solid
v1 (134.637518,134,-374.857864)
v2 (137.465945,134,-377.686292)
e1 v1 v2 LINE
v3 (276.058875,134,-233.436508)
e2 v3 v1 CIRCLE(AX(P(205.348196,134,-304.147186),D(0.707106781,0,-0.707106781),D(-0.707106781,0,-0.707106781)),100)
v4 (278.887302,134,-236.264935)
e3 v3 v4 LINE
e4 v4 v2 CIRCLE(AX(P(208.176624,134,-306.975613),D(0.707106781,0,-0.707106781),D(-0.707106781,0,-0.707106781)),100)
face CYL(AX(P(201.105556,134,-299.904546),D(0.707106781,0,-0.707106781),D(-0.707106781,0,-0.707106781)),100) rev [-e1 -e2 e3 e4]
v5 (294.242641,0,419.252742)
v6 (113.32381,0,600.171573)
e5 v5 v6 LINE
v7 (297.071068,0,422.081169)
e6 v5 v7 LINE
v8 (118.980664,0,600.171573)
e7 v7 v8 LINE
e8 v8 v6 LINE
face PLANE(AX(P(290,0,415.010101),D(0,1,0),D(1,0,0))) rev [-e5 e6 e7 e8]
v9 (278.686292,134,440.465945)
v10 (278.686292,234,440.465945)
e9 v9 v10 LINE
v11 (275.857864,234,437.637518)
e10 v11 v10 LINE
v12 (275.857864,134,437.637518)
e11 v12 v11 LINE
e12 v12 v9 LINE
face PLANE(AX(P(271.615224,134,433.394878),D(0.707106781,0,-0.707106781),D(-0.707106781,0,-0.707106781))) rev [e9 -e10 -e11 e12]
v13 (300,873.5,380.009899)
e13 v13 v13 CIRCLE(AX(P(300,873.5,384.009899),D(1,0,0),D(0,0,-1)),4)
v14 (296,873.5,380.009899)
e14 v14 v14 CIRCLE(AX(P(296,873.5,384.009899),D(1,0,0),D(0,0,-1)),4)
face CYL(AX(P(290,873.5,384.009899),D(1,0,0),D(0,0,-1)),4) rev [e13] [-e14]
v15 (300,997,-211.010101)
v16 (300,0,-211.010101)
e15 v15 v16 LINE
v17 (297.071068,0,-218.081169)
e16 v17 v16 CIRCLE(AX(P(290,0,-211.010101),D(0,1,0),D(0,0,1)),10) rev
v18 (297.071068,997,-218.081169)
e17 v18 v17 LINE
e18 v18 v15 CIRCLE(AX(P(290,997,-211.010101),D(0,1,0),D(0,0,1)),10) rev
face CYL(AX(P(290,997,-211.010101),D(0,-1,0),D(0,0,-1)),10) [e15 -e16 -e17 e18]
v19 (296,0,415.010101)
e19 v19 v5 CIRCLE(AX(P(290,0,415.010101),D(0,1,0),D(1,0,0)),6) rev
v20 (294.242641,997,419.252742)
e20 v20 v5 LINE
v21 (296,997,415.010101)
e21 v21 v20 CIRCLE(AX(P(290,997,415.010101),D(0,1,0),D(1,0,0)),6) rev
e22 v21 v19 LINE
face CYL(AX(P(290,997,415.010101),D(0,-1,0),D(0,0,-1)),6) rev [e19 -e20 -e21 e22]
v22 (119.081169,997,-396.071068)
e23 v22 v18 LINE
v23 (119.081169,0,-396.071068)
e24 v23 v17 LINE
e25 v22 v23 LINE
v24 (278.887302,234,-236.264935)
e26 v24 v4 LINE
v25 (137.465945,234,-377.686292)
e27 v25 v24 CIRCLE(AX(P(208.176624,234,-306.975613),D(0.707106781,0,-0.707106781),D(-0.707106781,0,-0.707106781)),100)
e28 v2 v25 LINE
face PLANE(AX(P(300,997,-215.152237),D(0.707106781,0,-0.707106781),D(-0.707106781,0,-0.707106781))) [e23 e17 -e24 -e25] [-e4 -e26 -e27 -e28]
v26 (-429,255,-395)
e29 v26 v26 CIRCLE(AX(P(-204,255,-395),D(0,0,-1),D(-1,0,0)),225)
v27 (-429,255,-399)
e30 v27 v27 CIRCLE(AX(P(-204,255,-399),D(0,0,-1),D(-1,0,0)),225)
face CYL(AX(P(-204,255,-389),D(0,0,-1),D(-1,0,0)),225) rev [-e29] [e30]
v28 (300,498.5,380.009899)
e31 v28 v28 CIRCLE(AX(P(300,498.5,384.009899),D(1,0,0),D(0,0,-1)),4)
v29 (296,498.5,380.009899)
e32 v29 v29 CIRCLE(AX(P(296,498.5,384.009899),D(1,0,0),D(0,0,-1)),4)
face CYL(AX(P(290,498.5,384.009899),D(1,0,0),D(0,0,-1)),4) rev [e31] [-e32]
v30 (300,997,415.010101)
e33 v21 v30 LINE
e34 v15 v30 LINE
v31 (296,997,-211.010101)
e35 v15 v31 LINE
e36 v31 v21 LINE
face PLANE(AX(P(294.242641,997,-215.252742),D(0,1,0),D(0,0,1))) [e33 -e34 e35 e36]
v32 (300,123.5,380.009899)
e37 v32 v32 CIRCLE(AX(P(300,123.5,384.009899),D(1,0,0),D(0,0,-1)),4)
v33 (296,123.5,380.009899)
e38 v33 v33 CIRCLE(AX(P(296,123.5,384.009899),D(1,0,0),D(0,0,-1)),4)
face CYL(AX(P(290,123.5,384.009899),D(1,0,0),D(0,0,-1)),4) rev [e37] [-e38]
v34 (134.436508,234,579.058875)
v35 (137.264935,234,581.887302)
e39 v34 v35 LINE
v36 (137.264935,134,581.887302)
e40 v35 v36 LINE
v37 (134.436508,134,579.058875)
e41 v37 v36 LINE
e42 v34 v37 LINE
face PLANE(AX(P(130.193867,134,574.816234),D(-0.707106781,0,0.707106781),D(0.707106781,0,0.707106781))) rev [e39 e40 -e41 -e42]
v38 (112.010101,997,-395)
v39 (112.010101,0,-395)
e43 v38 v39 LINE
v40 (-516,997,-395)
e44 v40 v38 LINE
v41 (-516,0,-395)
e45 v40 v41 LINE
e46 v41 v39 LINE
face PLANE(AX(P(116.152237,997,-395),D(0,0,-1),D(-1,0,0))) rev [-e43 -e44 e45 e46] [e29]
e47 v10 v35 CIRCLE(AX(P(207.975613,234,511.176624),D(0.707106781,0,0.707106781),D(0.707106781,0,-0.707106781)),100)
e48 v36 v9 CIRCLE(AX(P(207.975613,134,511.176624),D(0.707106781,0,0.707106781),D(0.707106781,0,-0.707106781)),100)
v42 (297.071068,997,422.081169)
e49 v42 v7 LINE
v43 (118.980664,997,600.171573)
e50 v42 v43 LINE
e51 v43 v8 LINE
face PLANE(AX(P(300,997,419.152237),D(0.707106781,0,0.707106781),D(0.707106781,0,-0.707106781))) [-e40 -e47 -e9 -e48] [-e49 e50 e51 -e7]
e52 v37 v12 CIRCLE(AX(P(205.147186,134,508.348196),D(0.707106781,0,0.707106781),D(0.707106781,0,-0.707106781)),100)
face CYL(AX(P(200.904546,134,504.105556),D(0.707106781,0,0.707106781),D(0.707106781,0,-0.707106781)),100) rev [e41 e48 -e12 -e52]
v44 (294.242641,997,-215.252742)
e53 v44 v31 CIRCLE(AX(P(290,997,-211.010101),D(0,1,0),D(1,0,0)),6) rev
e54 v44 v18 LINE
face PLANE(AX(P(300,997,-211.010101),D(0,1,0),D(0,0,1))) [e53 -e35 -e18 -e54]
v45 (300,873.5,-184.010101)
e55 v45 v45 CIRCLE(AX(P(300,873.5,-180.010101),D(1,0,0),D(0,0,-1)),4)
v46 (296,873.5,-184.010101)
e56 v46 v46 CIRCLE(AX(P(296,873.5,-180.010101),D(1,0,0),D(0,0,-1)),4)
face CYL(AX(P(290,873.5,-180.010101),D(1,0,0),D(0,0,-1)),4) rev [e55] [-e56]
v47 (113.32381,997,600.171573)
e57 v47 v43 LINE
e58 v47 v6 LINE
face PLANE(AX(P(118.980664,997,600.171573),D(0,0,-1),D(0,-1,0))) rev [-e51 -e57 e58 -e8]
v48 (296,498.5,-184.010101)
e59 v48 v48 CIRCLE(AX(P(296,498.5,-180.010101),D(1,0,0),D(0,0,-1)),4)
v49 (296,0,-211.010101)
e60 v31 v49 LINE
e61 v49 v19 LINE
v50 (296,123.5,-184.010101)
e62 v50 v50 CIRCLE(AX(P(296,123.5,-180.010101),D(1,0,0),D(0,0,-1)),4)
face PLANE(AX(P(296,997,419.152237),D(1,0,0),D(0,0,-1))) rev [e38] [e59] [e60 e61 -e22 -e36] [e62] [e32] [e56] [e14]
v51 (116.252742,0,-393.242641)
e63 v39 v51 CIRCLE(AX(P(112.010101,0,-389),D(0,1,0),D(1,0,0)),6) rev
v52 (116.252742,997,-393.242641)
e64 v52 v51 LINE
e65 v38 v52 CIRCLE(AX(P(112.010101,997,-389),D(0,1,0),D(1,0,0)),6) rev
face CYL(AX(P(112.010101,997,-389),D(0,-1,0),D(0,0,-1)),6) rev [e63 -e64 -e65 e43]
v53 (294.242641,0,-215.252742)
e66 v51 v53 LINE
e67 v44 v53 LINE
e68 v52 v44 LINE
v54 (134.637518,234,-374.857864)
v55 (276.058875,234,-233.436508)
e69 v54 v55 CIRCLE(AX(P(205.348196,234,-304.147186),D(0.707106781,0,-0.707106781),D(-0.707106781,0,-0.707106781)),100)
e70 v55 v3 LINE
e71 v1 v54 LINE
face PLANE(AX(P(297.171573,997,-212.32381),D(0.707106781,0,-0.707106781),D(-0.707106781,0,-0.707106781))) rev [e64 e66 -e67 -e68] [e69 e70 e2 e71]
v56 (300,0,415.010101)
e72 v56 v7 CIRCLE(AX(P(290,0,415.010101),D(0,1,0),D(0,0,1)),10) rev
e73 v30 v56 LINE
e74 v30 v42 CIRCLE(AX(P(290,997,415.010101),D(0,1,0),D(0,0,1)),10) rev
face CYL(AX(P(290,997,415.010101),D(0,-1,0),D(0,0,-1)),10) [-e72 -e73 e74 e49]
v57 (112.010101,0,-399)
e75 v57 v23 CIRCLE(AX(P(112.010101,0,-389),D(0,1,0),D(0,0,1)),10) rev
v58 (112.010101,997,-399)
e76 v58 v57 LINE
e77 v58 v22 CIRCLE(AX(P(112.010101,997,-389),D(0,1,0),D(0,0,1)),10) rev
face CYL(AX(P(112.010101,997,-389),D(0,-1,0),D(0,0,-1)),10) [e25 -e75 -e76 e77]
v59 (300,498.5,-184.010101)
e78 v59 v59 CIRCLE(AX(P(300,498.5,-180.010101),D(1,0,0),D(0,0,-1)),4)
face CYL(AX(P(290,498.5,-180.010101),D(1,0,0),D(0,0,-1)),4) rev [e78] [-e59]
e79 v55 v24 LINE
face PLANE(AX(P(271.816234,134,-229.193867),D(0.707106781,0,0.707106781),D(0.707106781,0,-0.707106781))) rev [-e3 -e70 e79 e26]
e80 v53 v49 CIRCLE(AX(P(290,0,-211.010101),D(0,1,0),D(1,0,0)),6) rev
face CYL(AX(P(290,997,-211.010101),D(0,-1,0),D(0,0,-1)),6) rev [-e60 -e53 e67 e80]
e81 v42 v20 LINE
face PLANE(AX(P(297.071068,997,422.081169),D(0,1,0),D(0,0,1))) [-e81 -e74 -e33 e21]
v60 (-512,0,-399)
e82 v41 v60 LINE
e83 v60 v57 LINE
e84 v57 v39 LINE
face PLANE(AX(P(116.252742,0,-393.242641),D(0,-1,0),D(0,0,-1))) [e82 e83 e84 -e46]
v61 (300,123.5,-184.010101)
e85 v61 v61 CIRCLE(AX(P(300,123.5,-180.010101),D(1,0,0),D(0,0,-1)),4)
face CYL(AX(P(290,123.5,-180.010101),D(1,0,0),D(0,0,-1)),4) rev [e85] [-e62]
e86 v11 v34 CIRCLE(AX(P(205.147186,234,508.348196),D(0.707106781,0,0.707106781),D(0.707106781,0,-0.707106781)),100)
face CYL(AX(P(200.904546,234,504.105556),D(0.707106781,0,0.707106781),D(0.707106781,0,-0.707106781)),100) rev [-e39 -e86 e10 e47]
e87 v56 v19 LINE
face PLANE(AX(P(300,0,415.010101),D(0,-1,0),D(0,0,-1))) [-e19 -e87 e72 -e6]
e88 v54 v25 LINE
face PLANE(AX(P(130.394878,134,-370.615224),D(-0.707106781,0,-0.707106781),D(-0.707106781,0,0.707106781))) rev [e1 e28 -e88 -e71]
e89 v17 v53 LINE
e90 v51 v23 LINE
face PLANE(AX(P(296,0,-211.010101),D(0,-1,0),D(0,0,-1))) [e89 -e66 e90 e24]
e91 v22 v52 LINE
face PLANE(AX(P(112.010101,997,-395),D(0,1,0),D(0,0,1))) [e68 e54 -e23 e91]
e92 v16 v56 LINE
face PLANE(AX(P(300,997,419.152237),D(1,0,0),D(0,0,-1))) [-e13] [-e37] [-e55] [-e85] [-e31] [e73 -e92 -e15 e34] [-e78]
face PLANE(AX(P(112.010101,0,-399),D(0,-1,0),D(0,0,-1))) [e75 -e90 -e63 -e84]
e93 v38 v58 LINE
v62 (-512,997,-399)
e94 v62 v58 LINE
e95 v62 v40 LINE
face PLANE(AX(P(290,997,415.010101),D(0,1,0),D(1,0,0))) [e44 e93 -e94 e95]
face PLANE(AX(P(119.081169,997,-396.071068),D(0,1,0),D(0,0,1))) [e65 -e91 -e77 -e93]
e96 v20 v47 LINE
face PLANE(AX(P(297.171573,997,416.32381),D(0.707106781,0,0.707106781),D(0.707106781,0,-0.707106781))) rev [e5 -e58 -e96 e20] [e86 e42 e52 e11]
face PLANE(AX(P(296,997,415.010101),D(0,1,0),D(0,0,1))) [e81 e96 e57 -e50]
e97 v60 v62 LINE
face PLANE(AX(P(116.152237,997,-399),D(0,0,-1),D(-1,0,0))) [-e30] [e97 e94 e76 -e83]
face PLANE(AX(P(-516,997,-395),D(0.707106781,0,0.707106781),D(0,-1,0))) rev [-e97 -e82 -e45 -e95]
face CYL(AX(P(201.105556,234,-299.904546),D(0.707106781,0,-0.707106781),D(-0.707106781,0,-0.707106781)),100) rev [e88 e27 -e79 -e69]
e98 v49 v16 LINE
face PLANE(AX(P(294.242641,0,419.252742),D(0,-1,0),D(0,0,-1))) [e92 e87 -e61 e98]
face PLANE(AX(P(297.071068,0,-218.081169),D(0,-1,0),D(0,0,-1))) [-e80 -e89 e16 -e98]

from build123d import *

# Parameters (mm, degrees)
BASE_FLANGE1_DEPTH   = 997
CUT_EXTRUDE1_DEPTH   = 10
SKETCH7_R            = 225
CUT_EXTRUDE2_DEPTH   = 10
SKETCH8_R            = 4
CUT_EXTRUDE3_DEPTH   = 10
CUT_EXTRUDE4_DEPTH   = 10
LPATTERN1_COUNT      = 3
LPATTERN1_PITCH      = 375
LPATTERN1_COUNT_DIR2 = 2
LPATTERN1_PITCH_DIR2 = 564.02
CHAMFER1_SIZE        = 4


# Sheet-metal steps are written as plain solids
with BuildPart() as part:
    # Sketch1 → Base-Flange1 (new body)
    with BuildSketch(Plane(origin=(0, 0, 0), x_dir=(1, 0, 0), z_dir=(0, 1, 0))):
        with BuildLine():
            Line((116.152236891, -603), (297.071067812, -422.08116908))
            ThreePointArc((297.071067812, -422.08116908), (299.238795325, -418.836935591), (300, -415.010101268))
            Line((300, -415.010101268), (300, 211.010101268))
            ThreePointArc((300, 211.010101268), (299.238795325, 214.836935591), (297.071067812, 218.08116908))
            Line((297.071067812, 218.08116908), (119.08116908, 396.071067812))
            ThreePointArc((119.08116908, 396.071067812), (115.836935591, 398.238795325), (112.010101268, 399))
            Line((112.010101268, 399), (-516, 399))
            Line((-516, 399), (-516, 395))
            Line((-516, 395), (112.010101268, 395))
            ThreePointArc((112.010101268, 395), (114.306201862, 394.543277195), (116.252741955, 393.242640687))
            Line((116.252741955, 393.242640687), (294.242640687, 215.252741955))
            ThreePointArc((294.242640687, 215.252741955), (295.543277195, 213.306201862), (296, 211.010101268))
            Line((296, 211.010101268), (296, -415.010101268))
            ThreePointArc((296, -415.010101268), (295.543277195, -417.306201862), (294.242640687, -419.252741955))
            Line((294.242640687, -419.252741955), (113.323809767, -600.171572875))
            Line((113.323809767, -600.171572875), (116.152236891, -603))
        make_face()
    extrude(amount=BASE_FLANGE1_DEPTH)

    # Sketch6 → Cut-Extrude1 (cut)
    with BuildSketch(Plane(origin=(257.576118446, 0, -257.576118446), x_dir=(-0.7071067811865485, 0, -0.7071067811865466), z_dir=(0.7071067811865466, 0, -0.7071067811865485))):
        with BuildLine():
            Line((-30.138564286, 134), (-30.138564286, 234))
            ThreePointArc((-30.138564286, 234), (69.861435714, 334), (169.861435714, 234))
            Line((169.861435714, 234), (169.861435714, 134))
            ThreePointArc((169.861435714, 134), (69.861435714, 34), (-30.138564286, 134))
        make_face()
    extrude(amount=-CUT_EXTRUDE1_DEPTH, mode=Mode.SUBTRACT)

    # Sketch7 → Cut-Extrude2 (cut)
    with BuildSketch(Plane(origin=(0, 0, -399), x_dir=(-1, 0, 0), z_dir=(0, 0, -1))):
        with Locations((204, 255)):
            Circle(SKETCH7_R)
    extrude(amount=-CUT_EXTRUDE2_DEPTH, mode=Mode.SUBTRACT)

    # Sketch8 → Cut-Extrude3 (cut)
    with BuildSketch(Plane(origin=(300, 0, 0), x_dir=(0, 0, -1), z_dir=(1, 0, 0))):
        with Locations((180.010101268, 873.5)):
            Circle(SKETCH8_R)
    cut_extrude3 = extrude(amount=-CUT_EXTRUDE3_DEPTH, mode=Mode.SUBTRACT)

    # Sketch9 → Cut-Extrude4 (cut)
    with BuildSketch(Plane(origin=(359.576118446, 0, 359.576118446), x_dir=(0.7071067811865415, 0, -0.7071067811865536), z_dir=(0.7071067811865536, 0, 0.7071067811865415))):
        with BuildLine():
            Line((-314.395490323, 134), (-314.395490323, 234))
            ThreePointArc((-314.395490323, 234), (-214.395490323, 334), (-114.395490323, 234))
            Line((-114.395490323, 234), (-114.395490323, 134))
            ThreePointArc((-114.395490323, 134), (-214.395490323, 34), (-314.395490323, 134))
        make_face()
    extrude(amount=-CUT_EXTRUDE4_DEPTH, mode=Mode.SUBTRACT)

    # LPattern1: Cut-Extrude3 3 × 2
    with Locations(*[(0, -i * LPATTERN1_PITCH, j * LPATTERN1_PITCH_DIR2) for i in range(LPATTERN1_COUNT) for j in range(LPATTERN1_COUNT_DIR2) if (i, j) != (0, 0)]):
        add(cut_extrude3, mode=Mode.SUBTRACT)

    # Chamfer1
    chamfer1_edges = [part.edges().sort_by_distance(p)[0] for p in [
        (-516, 498.5, -399),
        (116.152236891, 498.5, 603),
    ]]
    chamfer(chamfer1_edges, length=CHAMFER1_SIZE - 0.0001)  # a hair under: the kernel refuses the full size


solid = part.part
